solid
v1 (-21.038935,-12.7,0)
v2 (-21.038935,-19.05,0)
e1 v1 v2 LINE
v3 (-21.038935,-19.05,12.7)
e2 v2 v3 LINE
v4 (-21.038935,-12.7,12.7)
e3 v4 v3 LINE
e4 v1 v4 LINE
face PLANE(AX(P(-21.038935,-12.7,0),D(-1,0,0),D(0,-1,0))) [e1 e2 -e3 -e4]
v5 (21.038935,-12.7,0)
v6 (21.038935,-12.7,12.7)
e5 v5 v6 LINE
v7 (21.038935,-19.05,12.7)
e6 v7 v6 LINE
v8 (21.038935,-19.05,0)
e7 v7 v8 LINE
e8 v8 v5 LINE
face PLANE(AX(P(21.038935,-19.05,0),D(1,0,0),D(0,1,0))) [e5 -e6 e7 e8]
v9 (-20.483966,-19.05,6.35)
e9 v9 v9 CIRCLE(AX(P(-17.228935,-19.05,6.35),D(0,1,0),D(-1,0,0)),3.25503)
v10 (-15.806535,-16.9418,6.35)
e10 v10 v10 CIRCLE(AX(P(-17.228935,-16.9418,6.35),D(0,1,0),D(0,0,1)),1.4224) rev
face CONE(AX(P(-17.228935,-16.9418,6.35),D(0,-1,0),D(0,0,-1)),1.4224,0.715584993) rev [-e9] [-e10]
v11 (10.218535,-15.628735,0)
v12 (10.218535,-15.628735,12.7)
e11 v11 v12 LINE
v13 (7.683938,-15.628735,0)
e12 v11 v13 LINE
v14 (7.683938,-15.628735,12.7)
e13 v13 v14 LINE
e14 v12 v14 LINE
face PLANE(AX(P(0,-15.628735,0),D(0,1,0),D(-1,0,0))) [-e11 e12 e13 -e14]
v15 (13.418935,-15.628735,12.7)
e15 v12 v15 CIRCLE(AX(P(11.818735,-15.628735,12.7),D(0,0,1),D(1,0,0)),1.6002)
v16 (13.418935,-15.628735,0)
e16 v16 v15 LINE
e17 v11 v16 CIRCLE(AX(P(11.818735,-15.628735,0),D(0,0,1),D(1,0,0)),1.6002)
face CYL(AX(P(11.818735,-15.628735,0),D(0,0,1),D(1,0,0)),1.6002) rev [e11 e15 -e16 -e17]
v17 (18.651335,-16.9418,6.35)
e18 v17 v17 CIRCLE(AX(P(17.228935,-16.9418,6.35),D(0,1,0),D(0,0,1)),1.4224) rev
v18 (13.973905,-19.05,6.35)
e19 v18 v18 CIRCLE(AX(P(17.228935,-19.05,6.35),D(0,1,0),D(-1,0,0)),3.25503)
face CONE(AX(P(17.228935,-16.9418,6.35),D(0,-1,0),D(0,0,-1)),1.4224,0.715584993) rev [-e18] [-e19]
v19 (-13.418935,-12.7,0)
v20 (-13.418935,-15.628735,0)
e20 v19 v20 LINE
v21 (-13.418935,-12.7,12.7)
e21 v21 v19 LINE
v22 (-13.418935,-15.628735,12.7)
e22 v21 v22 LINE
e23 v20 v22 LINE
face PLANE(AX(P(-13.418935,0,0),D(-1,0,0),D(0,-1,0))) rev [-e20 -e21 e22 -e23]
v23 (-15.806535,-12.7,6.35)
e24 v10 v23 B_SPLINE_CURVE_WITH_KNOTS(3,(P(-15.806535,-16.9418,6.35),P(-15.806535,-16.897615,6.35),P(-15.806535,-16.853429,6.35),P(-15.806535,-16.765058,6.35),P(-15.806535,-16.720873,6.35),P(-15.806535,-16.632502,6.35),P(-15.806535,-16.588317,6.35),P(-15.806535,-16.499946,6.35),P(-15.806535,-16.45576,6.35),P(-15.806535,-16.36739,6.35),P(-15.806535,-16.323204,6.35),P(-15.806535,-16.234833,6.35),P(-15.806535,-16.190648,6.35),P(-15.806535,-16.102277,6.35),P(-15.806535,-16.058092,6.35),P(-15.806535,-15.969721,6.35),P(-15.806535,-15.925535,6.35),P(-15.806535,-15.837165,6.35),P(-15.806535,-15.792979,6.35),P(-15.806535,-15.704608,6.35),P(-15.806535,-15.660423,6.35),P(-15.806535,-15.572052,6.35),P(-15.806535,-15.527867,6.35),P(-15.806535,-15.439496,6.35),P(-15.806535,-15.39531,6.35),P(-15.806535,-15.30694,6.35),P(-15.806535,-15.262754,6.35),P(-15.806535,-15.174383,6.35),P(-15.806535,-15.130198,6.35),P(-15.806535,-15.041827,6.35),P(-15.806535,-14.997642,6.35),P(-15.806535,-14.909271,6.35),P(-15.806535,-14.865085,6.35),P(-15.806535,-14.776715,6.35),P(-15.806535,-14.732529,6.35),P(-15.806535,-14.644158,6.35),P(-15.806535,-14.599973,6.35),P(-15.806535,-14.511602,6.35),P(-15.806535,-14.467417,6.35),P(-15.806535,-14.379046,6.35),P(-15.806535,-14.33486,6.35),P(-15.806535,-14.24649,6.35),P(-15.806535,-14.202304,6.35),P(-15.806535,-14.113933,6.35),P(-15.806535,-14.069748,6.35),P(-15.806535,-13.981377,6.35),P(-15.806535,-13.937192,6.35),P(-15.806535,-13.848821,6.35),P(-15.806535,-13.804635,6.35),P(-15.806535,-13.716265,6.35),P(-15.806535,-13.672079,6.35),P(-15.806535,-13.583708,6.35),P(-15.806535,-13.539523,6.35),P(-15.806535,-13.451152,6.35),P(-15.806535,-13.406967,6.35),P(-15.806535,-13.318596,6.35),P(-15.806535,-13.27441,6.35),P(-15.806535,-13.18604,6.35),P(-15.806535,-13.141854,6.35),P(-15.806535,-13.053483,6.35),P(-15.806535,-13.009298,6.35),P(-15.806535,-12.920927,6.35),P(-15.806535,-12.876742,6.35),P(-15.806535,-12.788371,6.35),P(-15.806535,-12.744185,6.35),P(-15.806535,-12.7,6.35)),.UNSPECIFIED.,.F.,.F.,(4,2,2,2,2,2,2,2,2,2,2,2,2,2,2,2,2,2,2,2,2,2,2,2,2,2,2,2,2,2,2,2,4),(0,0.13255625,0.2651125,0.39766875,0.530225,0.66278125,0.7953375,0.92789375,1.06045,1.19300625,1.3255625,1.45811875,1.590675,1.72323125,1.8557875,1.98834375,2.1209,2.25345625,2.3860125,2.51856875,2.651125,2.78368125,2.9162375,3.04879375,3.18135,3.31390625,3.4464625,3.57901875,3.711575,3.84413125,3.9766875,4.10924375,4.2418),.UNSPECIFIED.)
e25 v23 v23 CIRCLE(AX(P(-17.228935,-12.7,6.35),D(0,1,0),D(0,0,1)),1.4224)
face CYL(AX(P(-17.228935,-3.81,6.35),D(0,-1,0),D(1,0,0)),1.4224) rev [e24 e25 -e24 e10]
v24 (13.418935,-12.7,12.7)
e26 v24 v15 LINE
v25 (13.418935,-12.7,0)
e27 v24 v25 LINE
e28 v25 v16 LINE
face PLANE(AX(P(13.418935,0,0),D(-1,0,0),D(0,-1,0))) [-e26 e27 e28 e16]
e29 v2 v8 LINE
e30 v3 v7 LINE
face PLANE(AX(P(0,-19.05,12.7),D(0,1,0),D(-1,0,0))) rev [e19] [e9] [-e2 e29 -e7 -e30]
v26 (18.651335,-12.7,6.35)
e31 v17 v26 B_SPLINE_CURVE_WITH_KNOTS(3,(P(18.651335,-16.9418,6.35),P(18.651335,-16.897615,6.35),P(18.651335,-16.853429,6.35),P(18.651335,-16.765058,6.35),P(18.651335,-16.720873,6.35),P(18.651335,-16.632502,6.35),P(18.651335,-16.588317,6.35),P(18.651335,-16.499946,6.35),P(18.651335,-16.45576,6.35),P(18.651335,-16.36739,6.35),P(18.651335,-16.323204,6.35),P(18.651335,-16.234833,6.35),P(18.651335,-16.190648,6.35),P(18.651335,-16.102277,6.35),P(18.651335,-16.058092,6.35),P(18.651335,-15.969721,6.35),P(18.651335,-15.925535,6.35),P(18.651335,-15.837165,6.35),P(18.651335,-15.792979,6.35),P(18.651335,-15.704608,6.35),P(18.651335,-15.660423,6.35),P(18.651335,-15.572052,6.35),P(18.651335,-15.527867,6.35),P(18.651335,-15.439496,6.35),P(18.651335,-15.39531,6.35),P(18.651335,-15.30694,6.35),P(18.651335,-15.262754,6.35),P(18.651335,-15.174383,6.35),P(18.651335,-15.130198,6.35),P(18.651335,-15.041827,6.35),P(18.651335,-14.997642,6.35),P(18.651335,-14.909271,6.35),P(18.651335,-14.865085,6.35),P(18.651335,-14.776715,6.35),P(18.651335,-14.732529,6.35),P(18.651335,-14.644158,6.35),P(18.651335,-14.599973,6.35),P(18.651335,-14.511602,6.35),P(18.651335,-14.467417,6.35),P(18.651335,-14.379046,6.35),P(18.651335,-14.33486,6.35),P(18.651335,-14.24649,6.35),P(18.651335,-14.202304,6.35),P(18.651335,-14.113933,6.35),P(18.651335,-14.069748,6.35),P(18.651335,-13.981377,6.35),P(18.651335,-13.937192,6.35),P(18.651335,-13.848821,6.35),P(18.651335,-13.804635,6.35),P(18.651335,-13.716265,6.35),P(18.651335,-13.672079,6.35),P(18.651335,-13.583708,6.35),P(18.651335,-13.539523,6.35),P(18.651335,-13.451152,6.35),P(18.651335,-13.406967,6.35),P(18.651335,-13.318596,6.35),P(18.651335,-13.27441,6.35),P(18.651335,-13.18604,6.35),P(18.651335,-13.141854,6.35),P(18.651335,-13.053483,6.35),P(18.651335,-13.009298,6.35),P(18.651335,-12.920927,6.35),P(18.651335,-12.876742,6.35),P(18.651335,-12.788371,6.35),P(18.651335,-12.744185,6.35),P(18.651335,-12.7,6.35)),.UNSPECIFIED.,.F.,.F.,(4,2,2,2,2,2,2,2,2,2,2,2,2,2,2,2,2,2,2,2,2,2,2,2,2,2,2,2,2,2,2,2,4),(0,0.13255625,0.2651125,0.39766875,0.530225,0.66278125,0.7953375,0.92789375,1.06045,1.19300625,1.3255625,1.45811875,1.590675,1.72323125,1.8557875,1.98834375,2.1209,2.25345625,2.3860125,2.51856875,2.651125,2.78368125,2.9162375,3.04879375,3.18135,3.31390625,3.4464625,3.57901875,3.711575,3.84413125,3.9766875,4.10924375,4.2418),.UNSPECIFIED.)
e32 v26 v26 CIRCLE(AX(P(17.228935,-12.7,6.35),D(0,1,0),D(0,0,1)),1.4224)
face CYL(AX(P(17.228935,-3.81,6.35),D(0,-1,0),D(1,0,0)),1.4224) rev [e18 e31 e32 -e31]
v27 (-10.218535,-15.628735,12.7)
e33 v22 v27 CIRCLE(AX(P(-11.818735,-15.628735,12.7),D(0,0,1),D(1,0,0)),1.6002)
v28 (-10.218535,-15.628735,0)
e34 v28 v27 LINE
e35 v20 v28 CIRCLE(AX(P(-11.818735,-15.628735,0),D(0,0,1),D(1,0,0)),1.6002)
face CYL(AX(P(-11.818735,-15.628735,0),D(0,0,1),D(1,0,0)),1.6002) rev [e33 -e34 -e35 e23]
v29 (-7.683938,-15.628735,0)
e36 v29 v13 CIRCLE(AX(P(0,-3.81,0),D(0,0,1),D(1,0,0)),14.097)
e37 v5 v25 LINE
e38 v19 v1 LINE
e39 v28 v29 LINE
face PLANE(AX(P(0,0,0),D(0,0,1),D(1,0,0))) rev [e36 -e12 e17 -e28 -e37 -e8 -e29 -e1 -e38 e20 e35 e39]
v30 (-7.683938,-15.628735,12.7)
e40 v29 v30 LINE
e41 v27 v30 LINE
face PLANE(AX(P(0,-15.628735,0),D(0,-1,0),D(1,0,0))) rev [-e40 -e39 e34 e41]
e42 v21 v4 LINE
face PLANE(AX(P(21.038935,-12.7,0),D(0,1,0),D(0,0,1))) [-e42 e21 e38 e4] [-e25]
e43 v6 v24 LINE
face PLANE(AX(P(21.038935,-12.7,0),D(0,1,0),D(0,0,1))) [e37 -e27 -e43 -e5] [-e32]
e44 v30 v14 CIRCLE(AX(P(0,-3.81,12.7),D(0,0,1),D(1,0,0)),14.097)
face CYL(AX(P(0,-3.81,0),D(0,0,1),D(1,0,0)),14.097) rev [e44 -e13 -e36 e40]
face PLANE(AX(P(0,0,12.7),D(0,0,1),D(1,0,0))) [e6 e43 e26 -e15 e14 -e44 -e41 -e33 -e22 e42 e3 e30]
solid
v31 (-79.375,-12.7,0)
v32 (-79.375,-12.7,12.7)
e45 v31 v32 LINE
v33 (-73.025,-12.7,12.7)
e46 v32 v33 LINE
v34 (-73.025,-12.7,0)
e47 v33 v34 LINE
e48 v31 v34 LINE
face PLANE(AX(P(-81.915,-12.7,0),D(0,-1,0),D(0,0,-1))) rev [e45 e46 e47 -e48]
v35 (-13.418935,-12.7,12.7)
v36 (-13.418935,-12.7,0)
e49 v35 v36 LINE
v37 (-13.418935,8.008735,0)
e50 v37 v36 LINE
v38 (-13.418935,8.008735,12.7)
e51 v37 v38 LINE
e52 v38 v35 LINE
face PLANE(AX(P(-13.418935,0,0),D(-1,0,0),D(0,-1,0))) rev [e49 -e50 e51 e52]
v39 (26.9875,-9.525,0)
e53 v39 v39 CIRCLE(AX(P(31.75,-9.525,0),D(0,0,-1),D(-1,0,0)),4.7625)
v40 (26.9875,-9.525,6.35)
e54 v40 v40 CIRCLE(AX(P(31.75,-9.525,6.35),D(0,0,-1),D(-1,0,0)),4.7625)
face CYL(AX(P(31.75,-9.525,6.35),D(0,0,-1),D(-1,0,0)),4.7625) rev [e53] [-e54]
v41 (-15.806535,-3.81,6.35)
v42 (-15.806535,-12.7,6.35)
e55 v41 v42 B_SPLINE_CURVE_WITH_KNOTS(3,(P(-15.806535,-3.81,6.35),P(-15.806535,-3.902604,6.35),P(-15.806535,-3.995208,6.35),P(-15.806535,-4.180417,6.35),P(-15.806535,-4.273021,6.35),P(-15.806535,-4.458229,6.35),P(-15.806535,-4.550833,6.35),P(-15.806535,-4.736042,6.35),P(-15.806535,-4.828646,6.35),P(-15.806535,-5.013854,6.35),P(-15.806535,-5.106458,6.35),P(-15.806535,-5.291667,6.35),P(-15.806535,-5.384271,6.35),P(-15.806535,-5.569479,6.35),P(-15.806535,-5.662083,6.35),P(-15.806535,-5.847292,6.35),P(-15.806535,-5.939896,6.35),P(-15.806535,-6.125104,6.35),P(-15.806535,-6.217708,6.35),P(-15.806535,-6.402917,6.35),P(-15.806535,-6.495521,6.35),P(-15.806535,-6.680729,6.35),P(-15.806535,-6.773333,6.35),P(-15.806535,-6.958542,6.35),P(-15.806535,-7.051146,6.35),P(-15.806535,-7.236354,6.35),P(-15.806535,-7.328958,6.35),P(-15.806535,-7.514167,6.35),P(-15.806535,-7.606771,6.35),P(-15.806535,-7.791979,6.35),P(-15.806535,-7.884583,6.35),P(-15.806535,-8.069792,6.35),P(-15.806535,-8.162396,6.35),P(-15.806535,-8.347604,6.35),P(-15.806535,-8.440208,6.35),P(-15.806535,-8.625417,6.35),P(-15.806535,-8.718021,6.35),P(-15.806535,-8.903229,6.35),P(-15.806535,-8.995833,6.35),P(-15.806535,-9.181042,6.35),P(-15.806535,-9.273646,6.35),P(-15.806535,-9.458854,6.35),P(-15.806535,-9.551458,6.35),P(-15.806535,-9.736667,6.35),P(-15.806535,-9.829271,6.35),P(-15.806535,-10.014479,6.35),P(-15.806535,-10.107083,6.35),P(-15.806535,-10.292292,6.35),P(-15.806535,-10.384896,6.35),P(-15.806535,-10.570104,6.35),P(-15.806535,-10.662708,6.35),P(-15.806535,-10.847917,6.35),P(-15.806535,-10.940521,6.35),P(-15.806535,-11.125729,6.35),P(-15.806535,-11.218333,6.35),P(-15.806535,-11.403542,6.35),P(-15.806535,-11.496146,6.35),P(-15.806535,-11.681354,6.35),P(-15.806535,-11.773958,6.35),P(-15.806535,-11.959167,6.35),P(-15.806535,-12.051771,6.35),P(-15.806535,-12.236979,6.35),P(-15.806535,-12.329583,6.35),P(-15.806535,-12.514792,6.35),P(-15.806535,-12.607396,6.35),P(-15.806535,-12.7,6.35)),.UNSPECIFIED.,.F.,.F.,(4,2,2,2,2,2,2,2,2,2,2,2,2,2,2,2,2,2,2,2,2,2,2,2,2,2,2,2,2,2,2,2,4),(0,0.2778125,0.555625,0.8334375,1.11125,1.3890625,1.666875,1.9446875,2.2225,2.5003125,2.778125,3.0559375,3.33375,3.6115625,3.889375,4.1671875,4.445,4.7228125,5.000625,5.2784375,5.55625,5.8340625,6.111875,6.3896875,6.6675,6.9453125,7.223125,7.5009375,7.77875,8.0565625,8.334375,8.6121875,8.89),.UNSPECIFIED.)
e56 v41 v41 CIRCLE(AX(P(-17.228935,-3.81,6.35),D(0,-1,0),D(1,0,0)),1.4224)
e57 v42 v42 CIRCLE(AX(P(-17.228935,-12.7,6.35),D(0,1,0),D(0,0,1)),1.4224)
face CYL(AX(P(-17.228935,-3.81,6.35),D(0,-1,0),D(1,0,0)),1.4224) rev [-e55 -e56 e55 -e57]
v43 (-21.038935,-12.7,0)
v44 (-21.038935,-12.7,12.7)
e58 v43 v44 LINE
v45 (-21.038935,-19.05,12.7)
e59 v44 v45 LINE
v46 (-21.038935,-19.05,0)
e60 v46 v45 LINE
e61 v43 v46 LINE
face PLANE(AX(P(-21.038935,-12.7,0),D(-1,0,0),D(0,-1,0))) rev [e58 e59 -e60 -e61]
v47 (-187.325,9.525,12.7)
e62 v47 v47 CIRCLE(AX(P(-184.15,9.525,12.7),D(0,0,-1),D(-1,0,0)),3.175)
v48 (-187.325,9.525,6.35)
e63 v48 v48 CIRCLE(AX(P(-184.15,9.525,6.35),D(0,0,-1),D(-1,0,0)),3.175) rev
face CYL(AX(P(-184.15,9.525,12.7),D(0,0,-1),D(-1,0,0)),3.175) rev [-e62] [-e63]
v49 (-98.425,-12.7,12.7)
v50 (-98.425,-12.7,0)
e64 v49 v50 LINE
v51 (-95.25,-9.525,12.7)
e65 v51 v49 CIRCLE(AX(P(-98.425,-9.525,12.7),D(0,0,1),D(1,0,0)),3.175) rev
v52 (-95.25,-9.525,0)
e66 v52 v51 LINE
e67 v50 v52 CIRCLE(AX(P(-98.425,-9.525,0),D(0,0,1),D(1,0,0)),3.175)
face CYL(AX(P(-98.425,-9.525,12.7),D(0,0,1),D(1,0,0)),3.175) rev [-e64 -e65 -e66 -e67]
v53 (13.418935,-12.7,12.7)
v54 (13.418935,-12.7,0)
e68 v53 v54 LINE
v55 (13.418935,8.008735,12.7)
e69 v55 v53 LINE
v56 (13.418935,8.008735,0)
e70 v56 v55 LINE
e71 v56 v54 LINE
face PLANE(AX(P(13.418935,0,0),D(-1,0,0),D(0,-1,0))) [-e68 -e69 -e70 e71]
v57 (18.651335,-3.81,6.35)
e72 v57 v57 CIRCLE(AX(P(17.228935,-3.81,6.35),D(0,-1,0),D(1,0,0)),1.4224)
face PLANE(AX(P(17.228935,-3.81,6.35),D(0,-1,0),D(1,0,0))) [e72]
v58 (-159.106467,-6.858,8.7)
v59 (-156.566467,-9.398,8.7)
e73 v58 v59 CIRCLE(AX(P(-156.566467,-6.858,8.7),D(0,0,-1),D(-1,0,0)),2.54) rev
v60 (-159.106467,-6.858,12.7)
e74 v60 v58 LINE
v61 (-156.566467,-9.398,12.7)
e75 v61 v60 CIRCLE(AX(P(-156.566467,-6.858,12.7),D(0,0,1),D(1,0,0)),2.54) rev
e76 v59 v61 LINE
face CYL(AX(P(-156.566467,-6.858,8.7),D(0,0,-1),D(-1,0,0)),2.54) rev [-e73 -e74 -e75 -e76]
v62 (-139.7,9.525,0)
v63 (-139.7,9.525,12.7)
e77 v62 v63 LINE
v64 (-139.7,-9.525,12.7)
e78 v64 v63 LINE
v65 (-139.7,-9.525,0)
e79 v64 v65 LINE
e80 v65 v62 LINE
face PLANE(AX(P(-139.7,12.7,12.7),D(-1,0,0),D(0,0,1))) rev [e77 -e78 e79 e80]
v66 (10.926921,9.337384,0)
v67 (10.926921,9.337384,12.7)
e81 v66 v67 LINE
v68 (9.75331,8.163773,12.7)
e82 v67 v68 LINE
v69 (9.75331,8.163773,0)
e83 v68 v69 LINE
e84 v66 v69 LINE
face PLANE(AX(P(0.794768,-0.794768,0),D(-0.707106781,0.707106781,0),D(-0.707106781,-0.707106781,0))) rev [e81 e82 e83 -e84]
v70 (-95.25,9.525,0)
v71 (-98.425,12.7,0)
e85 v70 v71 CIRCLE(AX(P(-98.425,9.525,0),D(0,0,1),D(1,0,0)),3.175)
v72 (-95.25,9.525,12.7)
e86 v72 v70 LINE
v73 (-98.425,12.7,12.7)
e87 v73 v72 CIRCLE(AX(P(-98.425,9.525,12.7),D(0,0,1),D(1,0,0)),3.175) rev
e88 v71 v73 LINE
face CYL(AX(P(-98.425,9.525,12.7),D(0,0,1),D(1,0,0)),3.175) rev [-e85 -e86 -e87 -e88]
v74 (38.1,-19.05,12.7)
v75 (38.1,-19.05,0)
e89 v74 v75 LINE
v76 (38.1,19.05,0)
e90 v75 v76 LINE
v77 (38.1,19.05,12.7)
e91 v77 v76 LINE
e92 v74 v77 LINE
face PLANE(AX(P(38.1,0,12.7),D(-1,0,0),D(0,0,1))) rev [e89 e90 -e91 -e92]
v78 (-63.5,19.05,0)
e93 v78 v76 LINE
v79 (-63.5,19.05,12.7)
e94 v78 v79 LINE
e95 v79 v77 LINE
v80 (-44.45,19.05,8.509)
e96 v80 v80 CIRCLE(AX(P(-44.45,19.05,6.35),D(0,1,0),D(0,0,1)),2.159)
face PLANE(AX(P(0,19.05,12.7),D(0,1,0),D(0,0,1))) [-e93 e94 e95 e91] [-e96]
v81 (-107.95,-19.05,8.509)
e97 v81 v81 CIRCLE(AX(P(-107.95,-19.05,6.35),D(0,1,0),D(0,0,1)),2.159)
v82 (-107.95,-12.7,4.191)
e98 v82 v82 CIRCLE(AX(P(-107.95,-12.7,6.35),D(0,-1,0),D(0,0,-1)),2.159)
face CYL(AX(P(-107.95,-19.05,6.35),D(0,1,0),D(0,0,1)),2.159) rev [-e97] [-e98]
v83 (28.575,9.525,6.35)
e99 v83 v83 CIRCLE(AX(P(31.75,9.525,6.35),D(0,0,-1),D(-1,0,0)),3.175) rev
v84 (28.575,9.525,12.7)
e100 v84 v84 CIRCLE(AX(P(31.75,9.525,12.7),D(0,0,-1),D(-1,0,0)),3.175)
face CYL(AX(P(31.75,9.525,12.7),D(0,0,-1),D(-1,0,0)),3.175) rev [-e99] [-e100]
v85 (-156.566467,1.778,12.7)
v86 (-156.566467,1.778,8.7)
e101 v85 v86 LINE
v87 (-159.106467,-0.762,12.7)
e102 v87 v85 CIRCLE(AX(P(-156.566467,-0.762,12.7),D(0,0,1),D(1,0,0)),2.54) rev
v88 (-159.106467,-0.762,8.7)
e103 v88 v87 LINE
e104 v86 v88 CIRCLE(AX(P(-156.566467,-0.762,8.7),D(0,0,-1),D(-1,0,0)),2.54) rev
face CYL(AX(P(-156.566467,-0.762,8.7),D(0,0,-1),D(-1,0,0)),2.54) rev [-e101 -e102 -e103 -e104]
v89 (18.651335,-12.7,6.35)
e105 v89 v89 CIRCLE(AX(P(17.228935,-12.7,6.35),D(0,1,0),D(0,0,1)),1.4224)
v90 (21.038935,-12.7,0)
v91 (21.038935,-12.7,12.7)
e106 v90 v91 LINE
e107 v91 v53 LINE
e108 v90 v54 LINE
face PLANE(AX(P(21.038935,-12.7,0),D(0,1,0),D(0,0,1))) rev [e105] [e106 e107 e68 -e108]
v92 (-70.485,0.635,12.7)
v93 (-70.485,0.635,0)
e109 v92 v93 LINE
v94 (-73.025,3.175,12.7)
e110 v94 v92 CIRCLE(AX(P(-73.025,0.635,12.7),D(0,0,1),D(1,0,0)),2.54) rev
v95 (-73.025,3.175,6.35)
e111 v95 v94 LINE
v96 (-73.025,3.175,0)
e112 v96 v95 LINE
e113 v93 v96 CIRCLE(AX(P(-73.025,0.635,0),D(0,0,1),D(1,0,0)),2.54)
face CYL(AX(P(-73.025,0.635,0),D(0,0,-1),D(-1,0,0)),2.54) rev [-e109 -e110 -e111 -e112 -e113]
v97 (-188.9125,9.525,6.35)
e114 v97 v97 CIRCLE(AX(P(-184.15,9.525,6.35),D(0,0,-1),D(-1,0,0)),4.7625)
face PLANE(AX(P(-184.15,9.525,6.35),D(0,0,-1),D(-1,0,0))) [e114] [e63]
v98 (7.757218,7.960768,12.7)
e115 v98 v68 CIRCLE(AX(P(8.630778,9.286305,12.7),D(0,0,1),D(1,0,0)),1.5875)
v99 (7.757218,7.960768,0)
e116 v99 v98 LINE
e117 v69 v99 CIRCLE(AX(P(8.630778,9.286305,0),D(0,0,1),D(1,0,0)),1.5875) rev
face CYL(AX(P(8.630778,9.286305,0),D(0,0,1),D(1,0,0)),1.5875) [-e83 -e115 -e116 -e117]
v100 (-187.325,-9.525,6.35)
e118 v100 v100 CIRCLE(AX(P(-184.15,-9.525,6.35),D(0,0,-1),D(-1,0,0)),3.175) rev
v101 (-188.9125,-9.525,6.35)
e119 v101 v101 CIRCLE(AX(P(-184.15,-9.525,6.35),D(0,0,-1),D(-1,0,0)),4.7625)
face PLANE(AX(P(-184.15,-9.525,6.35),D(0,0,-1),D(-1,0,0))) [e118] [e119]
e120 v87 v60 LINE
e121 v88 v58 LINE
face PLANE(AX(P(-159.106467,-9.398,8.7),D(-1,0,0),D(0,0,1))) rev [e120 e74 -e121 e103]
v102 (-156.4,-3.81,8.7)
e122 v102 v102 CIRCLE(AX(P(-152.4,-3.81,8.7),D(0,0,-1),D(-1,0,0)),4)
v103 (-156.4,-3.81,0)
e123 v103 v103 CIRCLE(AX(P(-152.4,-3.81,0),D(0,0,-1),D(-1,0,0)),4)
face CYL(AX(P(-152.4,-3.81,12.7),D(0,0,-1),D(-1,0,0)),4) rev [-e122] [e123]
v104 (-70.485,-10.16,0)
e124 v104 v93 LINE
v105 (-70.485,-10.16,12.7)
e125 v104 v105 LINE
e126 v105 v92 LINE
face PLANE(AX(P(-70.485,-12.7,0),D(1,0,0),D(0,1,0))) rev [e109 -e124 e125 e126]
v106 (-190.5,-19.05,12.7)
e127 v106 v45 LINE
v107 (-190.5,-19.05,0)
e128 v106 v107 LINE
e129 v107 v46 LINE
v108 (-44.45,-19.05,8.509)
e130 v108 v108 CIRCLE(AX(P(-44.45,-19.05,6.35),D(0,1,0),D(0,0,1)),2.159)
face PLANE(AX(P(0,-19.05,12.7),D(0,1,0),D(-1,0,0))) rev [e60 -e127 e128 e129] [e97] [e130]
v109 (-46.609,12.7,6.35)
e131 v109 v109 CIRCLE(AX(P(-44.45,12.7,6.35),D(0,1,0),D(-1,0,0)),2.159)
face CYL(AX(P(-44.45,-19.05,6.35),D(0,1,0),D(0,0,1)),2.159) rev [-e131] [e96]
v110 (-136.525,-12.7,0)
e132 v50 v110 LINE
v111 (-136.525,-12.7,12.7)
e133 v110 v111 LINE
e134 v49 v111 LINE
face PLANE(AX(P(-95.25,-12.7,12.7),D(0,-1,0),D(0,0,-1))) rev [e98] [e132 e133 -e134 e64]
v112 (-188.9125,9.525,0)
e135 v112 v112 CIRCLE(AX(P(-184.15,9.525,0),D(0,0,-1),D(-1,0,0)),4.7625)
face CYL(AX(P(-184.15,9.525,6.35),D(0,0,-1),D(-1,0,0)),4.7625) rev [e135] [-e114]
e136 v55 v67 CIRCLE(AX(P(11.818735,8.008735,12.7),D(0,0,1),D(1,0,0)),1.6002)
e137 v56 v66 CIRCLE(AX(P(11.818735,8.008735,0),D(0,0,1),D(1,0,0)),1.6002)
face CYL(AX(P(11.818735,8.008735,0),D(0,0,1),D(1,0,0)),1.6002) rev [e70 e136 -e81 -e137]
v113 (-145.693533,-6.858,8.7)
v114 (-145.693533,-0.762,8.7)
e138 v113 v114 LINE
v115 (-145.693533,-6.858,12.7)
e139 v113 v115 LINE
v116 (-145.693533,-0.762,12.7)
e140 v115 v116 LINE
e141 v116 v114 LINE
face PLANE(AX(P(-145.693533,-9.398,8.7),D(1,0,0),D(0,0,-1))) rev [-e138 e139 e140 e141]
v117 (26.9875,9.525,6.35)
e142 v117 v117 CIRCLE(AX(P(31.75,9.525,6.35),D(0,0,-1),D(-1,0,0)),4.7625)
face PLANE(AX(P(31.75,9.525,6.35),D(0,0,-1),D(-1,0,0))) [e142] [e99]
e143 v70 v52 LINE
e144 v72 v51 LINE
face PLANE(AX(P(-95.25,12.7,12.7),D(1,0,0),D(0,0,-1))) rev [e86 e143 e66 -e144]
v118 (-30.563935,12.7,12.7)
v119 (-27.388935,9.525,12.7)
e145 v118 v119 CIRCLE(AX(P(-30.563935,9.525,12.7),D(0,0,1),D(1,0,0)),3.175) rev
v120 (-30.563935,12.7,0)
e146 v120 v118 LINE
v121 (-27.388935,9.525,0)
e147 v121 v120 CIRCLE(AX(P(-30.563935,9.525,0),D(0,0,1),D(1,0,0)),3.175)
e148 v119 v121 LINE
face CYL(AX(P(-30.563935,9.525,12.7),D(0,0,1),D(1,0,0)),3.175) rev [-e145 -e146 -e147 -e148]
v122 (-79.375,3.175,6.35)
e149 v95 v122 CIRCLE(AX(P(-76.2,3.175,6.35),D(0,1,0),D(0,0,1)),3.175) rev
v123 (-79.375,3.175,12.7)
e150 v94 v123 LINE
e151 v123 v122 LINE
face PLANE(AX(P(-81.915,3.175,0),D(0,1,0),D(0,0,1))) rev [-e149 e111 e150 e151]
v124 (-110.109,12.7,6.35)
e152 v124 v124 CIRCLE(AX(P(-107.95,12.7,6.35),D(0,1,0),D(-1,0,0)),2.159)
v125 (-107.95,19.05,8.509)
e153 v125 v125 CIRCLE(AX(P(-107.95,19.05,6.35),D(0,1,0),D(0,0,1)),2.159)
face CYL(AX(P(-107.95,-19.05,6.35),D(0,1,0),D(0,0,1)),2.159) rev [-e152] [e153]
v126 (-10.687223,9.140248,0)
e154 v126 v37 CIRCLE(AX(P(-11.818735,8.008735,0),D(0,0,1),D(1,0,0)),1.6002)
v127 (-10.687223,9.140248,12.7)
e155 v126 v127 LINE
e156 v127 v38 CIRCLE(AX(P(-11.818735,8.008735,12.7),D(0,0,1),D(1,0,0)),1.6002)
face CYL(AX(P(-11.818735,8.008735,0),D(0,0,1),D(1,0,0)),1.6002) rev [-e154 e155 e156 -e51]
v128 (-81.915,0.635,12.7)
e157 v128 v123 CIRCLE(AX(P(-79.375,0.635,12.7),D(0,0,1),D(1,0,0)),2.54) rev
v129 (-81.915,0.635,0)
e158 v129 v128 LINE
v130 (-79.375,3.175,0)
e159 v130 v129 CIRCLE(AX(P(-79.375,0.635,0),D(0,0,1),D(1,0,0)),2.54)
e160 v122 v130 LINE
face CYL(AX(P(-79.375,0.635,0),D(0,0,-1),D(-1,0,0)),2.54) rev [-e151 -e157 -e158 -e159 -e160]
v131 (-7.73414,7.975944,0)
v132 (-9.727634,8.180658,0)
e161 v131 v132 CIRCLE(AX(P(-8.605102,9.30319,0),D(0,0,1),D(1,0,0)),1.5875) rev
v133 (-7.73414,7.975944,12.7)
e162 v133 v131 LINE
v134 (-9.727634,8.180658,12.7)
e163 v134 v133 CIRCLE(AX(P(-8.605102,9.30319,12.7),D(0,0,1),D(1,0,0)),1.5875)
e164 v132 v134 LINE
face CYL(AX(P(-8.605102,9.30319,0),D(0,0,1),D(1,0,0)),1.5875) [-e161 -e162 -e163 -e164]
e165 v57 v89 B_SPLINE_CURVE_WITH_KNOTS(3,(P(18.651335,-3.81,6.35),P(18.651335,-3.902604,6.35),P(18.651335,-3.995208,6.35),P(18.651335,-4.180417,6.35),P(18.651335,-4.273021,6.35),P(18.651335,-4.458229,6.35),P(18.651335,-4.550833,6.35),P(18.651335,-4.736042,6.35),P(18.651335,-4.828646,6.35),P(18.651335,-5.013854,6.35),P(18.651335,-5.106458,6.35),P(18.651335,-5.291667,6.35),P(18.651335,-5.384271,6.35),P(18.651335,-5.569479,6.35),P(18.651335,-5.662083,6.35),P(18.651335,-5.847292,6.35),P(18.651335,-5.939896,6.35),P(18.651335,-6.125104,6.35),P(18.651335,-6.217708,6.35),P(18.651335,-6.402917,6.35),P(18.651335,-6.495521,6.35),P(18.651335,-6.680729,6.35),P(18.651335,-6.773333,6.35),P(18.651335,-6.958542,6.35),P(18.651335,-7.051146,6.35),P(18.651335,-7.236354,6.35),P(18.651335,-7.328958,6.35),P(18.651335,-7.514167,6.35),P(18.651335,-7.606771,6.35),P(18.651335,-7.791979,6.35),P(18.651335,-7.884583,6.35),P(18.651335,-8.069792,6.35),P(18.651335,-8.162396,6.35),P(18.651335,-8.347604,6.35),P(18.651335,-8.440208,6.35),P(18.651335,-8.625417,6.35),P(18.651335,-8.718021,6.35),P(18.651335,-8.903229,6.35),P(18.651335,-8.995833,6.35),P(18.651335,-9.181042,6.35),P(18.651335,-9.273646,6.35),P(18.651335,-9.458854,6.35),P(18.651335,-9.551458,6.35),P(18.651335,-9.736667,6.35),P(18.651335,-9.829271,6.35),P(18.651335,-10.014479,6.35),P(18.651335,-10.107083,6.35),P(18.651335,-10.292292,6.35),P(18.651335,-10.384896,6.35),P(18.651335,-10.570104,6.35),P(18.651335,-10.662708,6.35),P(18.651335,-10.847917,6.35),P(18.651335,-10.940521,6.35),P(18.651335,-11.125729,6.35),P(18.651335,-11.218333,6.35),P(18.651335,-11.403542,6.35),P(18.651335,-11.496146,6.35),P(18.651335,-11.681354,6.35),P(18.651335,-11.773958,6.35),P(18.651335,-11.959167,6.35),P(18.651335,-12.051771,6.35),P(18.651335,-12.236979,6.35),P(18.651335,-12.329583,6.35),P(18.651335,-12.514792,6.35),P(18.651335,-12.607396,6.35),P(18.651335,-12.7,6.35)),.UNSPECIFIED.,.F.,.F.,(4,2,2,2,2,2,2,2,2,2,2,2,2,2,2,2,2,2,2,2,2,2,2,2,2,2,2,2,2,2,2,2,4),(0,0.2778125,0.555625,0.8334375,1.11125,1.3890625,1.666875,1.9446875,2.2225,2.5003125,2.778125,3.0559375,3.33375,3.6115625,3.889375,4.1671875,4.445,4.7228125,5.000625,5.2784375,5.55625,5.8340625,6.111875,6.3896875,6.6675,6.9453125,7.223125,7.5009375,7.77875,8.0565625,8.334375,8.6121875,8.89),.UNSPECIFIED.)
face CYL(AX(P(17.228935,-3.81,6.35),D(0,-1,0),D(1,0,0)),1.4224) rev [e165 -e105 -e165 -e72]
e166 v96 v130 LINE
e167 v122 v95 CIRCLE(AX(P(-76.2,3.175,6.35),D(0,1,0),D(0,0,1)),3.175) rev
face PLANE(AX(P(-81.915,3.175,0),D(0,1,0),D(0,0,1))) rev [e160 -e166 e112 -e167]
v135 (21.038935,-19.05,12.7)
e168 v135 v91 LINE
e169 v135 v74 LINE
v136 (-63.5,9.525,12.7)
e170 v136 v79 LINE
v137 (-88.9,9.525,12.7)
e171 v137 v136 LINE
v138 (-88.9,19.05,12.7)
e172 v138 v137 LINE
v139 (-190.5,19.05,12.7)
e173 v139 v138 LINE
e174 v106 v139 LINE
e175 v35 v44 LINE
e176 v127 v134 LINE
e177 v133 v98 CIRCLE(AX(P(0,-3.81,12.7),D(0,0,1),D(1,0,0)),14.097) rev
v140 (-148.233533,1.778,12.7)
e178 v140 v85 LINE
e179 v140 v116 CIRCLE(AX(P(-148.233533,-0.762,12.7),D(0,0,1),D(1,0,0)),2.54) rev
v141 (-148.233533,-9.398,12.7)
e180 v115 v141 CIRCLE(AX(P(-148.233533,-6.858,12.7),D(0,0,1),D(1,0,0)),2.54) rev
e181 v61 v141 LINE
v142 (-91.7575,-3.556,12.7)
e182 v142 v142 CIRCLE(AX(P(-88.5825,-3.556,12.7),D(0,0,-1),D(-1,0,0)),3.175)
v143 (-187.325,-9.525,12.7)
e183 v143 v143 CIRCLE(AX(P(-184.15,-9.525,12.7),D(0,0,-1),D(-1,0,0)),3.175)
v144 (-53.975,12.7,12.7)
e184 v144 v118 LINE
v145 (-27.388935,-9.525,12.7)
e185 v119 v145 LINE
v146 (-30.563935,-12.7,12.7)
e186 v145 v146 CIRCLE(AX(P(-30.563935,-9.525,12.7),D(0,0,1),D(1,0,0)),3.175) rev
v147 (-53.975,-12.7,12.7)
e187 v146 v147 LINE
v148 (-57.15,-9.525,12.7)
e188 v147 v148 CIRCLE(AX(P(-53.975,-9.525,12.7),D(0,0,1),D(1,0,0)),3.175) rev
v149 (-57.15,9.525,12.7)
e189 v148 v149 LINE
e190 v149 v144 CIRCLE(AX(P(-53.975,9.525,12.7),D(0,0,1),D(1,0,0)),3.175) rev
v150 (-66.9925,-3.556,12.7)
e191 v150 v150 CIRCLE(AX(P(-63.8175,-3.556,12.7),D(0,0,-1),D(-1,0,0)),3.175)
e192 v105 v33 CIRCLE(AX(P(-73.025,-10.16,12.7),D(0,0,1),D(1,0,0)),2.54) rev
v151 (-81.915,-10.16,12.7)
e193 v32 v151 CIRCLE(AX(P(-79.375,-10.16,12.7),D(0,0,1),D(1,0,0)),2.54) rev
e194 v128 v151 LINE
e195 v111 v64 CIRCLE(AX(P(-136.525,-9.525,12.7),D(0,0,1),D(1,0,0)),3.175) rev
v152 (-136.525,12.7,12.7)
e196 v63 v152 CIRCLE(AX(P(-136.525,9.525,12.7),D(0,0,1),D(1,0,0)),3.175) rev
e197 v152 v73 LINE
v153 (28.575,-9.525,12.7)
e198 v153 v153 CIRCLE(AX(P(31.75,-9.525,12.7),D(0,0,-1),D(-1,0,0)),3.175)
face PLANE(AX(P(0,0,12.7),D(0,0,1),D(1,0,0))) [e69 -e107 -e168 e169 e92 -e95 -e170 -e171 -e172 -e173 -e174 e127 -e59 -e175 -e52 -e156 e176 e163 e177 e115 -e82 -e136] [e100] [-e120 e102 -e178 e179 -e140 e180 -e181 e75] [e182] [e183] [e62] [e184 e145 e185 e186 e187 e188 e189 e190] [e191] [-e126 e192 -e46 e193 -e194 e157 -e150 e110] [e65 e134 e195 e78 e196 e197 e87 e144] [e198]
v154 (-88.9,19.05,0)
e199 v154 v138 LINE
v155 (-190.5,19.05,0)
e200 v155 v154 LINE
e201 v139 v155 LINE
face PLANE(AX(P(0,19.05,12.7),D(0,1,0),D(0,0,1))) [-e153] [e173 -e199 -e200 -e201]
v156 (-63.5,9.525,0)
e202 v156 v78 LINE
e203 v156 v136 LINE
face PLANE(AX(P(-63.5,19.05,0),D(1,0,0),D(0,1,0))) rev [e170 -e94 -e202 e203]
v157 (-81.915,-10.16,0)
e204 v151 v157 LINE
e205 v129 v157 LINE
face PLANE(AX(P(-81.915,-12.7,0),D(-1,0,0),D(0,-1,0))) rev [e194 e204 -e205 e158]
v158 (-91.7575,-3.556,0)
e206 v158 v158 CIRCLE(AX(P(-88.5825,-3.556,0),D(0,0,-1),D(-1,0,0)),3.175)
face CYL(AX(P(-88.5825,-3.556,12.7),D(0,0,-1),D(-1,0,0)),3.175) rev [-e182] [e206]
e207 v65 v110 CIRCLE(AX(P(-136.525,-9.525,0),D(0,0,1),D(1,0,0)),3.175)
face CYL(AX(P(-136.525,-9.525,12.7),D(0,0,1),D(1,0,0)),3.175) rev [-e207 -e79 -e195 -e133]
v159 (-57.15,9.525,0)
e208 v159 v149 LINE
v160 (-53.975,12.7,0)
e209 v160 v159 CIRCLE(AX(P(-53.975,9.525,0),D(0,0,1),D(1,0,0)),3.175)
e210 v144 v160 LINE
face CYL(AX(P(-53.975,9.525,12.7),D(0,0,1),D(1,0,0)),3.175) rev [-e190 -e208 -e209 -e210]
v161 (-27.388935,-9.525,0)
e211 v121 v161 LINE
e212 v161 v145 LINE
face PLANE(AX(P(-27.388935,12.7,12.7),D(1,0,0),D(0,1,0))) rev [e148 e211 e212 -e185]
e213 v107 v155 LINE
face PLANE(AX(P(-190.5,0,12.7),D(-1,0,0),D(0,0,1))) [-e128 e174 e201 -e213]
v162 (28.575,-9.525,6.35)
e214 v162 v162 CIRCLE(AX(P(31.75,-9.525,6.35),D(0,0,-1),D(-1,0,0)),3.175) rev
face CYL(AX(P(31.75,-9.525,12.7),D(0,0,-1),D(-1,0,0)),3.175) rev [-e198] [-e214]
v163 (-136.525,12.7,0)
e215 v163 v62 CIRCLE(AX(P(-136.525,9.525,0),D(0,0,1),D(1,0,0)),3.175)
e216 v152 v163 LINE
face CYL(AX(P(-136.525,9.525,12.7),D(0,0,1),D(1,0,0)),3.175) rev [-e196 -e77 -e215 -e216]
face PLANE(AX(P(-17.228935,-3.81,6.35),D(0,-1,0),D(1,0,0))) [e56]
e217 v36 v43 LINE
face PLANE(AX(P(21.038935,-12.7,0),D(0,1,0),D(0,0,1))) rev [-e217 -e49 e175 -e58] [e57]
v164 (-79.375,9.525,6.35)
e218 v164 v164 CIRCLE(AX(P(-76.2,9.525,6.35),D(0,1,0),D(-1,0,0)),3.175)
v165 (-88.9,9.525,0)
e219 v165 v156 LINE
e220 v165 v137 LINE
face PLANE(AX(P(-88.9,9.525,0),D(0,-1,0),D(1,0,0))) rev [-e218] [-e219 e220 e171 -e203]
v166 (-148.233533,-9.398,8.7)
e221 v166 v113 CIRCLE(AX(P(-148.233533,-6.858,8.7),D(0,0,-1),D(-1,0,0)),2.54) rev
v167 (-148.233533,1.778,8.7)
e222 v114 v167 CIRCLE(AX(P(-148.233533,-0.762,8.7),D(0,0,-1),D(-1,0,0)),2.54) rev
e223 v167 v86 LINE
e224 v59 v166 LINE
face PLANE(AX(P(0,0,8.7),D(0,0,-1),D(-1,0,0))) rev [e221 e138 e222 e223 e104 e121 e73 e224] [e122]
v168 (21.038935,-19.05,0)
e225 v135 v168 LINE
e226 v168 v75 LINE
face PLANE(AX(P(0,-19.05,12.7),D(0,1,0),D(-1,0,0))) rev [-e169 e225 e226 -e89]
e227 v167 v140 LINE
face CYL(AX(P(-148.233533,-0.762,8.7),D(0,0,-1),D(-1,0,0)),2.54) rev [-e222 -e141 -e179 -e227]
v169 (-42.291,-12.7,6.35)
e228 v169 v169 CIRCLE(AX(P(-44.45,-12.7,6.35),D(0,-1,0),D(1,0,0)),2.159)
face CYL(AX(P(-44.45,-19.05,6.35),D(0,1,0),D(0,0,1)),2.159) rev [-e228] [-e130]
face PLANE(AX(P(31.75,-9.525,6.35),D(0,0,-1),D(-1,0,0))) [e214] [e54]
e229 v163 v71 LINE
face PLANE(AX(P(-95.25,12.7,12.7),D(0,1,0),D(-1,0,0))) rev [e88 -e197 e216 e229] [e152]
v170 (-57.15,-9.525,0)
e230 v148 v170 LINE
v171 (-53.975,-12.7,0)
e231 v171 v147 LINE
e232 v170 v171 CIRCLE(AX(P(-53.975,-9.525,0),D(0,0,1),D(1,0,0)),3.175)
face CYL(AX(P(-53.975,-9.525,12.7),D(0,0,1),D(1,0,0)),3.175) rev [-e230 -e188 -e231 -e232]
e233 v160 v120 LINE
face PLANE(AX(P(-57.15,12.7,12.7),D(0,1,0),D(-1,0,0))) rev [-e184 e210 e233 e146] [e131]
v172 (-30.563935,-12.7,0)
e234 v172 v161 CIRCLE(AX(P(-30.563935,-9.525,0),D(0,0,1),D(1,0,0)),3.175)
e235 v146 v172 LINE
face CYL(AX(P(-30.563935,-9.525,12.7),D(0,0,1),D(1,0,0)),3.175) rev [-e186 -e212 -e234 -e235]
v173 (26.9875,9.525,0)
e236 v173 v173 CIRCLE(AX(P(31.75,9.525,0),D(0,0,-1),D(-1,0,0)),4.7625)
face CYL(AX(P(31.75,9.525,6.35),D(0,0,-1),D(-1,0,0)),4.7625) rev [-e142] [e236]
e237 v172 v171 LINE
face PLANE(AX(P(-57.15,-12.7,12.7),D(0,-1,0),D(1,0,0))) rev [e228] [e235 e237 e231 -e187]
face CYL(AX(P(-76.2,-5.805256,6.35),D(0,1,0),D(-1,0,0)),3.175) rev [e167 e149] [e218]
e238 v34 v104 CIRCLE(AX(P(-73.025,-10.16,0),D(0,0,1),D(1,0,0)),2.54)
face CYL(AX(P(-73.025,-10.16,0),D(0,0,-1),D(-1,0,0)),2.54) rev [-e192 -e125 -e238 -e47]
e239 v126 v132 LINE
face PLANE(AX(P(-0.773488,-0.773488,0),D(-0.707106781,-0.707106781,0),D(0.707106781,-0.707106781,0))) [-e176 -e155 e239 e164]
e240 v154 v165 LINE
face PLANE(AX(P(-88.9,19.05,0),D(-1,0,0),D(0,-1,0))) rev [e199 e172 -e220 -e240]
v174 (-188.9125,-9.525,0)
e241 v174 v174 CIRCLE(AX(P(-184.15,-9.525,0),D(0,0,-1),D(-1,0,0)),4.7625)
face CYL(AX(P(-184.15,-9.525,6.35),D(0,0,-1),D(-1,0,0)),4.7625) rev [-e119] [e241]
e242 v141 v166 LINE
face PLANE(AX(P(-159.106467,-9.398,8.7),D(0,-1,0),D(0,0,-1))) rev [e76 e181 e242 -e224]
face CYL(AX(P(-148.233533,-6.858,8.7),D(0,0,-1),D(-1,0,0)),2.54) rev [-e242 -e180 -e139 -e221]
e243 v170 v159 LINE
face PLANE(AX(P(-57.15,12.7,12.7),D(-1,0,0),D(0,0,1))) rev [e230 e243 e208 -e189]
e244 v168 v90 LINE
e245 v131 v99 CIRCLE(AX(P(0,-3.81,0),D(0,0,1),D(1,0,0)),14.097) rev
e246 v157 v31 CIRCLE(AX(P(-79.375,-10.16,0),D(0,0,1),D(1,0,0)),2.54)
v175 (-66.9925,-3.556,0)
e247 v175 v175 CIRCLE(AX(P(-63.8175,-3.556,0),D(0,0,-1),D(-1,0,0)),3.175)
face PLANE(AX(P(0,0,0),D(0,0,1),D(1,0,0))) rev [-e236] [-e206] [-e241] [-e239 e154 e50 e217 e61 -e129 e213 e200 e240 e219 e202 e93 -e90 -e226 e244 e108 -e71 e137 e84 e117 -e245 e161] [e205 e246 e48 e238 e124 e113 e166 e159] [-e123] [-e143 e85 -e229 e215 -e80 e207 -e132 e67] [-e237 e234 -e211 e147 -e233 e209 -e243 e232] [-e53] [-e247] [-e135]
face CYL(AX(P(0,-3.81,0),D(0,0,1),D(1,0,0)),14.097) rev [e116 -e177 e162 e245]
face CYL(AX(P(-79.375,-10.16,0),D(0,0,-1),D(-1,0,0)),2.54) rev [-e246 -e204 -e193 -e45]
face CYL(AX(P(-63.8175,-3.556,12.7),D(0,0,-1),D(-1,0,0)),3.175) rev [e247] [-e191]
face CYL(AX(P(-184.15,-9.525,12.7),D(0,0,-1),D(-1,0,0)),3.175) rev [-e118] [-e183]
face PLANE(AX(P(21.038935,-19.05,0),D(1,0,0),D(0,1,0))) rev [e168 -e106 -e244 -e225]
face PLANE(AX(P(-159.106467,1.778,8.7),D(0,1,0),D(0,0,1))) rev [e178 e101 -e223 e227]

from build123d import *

# Parameters (mm, degrees)
SKETCH1_W                = 228.6
SKETCH1_H                = 38.1
BOSS_EXTRUDE1_DEPTH      = 12.7
CUT_EXTRUDE4_DEPTH       = 192.870900608
FILLET1_R                = 1.5875
SKETCH6_W                = 25.4
SKETCH6_H                = 9.525
CUT_EXTRUDE5_DEPTH       = 192.870900608
SKETCH7_W                = 11.43
SKETCH7_H                = 15.875
CUT_EXTRUDE6_DEPTH       = 192.870900608
SKETCH8_R                = 3.175
CUT_EXTRUDE7_DEPTH       = 6.35
SKETCH9_R                = 3.175
CUT_EXTRUDE8_DEPTH       = 192.870900608
SKETCH10_R               = 4.7625
CUT_EXTRUDE9_DEPTH       = 6.35
SURFACE_EXTRUDE1_1_BACK  = 12.7
SURFACE_EXTRUDE1_1_DEPTH = 12.7
SURFACE_EXTRUDE1_2_BACK  = 12.7
SURFACE_EXTRUDE1_2_DEPTH = 12.7
FILLET2_R                = 2.54
SKETCH12_R               = 1.4224
CUT_EXTRUDE10_DEPTH      = 15.24
CHAMFER1_SIZE            = 2.1082
CHAMFER1_SIZE2           = 1.832630301
CHAMFER2_SIZE            = 2.1082
CHAMFER2_SIZE2           = 1.832630301
SKETCH13_W               = 29.761064524
SKETCH13_H               = 25.4
SKETCH13_W_2             = 44.45
CUT_EXTRUDE11_DEPTH      = 192.870900608
FILLET3_R                = 3.175
SKETCH14_R               = 2.159
CUT_EXTRUDE12_DEPTH      = 195.687313403
SKETCH15_R               = 3.175
CUT_EXTRUDE13_DEPTH      = 192.870900608
SKETCH16_W               = 13.412933216
SKETCH16_H               = 11.176
CUT_EXTRUDE14_DEPTH      = 4.000000128
FILLET4_R                = 2.54
SKETCH17_R               = 3.175
CUT_EXTRUDE15_DEPTH      = 192.870900608
SKETCH18_R               = 4
CUT_EXTRUDE16_DEPTH      = 192.870900608


with BuildPart() as part:
    # Sketch1 → Boss-Extrude1 (new body)
    with BuildSketch(Plane.XY):
        with Locations((-76.2, 0)):
            Rectangle(SKETCH1_W, SKETCH1_H)
    extrude(amount=BOSS_EXTRUDE1_DEPTH)

    # Sketch5 → Cut-Extrude4 (cut, through all)
    with BuildSketch(Plane.XY.offset(12.7)):
        with BuildLine():
            Line((-8.772142836, 7.225167378), (-10.687223205, 9.140247747))
            ThreePointArc((-10.687223205, 9.140247747), (-12.431105504, 9.487127504), (-13.418935476, 8.008735476))
            Line((-13.418935476, 8.008735476), (-13.418935476, -15.628735476))
            ThreePointArc((-13.418935476, -15.628735476), (-11.818735476, -17.228935476), (-10.218535476, -15.628735476))
            Line((-10.218535476, -15.628735476), (-7.683937842, -15.628735476))
            ThreePointArc((-7.683937842, -15.628735476), (0, -17.907), (7.683937842, -15.628735476))
            Line((7.683937842, -15.628735476), (10.218535476, -15.628735476))
            ThreePointArc((10.218535476, -15.628735476), (11.818735476, -17.228935476), (13.418935476, -15.628735476))
            Line((13.418935476, -15.628735476), (13.418935476, 8.008735476))
            ThreePointArc((13.418935476, 8.008735476), (12.571582801, 9.420776887), (10.926920796, 9.337383893))
            Line((10.926920796, 9.337383893), (8.795831767, 7.206294864))
            ThreePointArc((8.795831767, 7.206294864), (0.015143788, 10.286991866), (-8.772142836, 7.225167378))
        make_face()
    extrude(amount=-CUT_EXTRUDE4_DEPTH, mode=Mode.SUBTRACT)

    # Fillet1
    fillet1_edges = [part.edges().sort_by_distance(p)[0] for p in [
        (-8.772142836, 7.225167378, 6.35),
        (8.795831767, 7.206294864, 6.35),
    ]]
    fillet(fillet1_edges, radius=FILLET1_R)

    # Sketch6 → Cut-Extrude5 (cut, through all)
    with BuildSketch(Plane.XY.offset(12.7)):
        with Locations((-76.2, 14.2875)):
            Rectangle(SKETCH6_W, SKETCH6_H)
    extrude(amount=-CUT_EXTRUDE5_DEPTH, mode=Mode.SUBTRACT)

    # Sketch7 → Cut-Extrude6 (cut, through all)
    with BuildSketch(Plane.XY.offset(12.7)):
        with Locations((-76.2, -4.7625)):
            Rectangle(SKETCH7_W, SKETCH7_H)
    extrude(amount=-CUT_EXTRUDE6_DEPTH, mode=Mode.SUBTRACT)

    # Sketch8 → Cut-Extrude7 (cut)
    with BuildSketch(Plane(origin=(0, 9.525, 0), x_dir=(1, 0, 0), z_dir=(0, 1, 0))):
        with Locations(Location((-76.2, -6.35, 0), (0, 0, 180))):
            Circle(SKETCH8_R)
    extrude(amount=-CUT_EXTRUDE7_DEPTH, mode=Mode.SUBTRACT)

    # Sketch9 → Cut-Extrude8 (cut, through all)
    with BuildSketch(Plane(origin=(0, 0, 0), x_dir=(-1, 0, 0), z_dir=(0, 0, -1))):
        with Locations((-31.75, 9.525)):
            Circle(SKETCH9_R)
        with Locations((-31.75, -9.525)):
            Circle(SKETCH9_R)
        with Locations((184.15, 9.525)):
            Circle(SKETCH9_R)
        with Locations((184.15, -9.525)):
            Circle(SKETCH9_R)
    extrude(amount=-CUT_EXTRUDE8_DEPTH, mode=Mode.SUBTRACT)

    # Sketch10 → Cut-Extrude9 (cut)
    with BuildSketch(Plane(origin=(0, 0, 0), x_dir=(-1, 0, 0), z_dir=(0, 0, -1))):
        with Locations((-31.75, 9.525)):
            Circle(SKETCH10_R)
        with Locations((-31.75, -9.525)):
            Circle(SKETCH10_R)
        with Locations((184.15, 9.525)):
            Circle(SKETCH10_R)
        with Locations((184.15, -9.525)):
            Circle(SKETCH10_R)
    extrude(amount=-CUT_EXTRUDE9_DEPTH, mode=Mode.SUBTRACT)


with BuildPart() as body_2:
    # Split1: the piece behind the surface
    add(part.part)
    # Surface-Extrude1: a surface, the sketch's curves swept straight by 12.7 mm
    with BuildLine(Plane(origin=(0, 0, 0), x_dir=(-1, 0, 0), z_dir=(0, 0, -1)).offset(-SURFACE_EXTRUDE1_1_BACK), mode=Mode.PRIVATE) as surface_extrude1_1_path:
        Line((-21.038935476, -19.05), (-21.038935476, -12.7))
        Line((-21.038935476, -12.7), (21.038935476, -12.7))
        Line((21.038935476, -12.7), (21.038935476, -19.05))
    surface_extrude1_1 = Shell.extrude(surface_extrude1_1_path.wire(), (0 * SURFACE_EXTRUDE1_1_DEPTH, 0 * SURFACE_EXTRUDE1_1_DEPTH, -1 * SURFACE_EXTRUDE1_1_DEPTH))
    split(bisect_by=surface_extrude1_1, keep=Keep.BOTTOM)


with BuildPart() as part_1:
    add(part.part)

    # Split1: split by a surface, the side it looks to stays
    # Surface-Extrude1: a surface, the sketch's curves swept straight by 12.7 mm
    with BuildLine(Plane(origin=(0, 0, 0), x_dir=(-1, 0, 0), z_dir=(0, 0, -1)).offset(-SURFACE_EXTRUDE1_2_BACK), mode=Mode.PRIVATE) as surface_extrude1_2_path:
        Line((-21.038935476, -19.05), (-21.038935476, -12.7))
        Line((-21.038935476, -12.7), (21.038935476, -12.7))
        Line((21.038935476, -12.7), (21.038935476, -19.05))
    surface_extrude1_2 = Shell.extrude(surface_extrude1_2_path.wire(), (0 * SURFACE_EXTRUDE1_2_DEPTH, 0 * SURFACE_EXTRUDE1_2_DEPTH, -1 * SURFACE_EXTRUDE1_2_DEPTH))
    split(bisect_by=surface_extrude1_2, keep=Keep.TOP)

    # Fillet2
    fillet2_edges = [part_1.edges().sort_by_distance(p)[0] for p in [
        (-70.485, -12.7, 6.35),
        (-81.915, -12.7, 6.35),
        (-81.915, 3.175, 6.35),
        (-70.485, 3.175, 6.35),
    ]]
    fillet(fillet2_edges, radius=FILLET2_R - 0.0001)  # a hair under: the kernel refuses the full size


with BuildPart() as cut_extrude10_tool:
    # Sketch12 → Cut-Extrude10 (new body)
    with BuildSketch(Plane.XZ.offset(19.05)):
        with Locations((-17.228935476, 6.35)):
            Circle(SKETCH12_R)
        with Locations((17.228935476, 6.35)):
            Circle(SKETCH12_R)
    extrude(amount=-CUT_EXTRUDE10_DEPTH)


with BuildPart() as part_2:
    add(part_1.part)

    # Cut-Extrude10: cut by cut_extrude10_tool
    add(cut_extrude10_tool.part, mode=Mode.SUBTRACT)

    # Sketch13 → Cut-Extrude11 (cut, through all)
    with BuildSketch(Plane(origin=(0, 0, 0), x_dir=(-1, 0, 0), z_dir=(0, 0, -1))):
        with Locations((42.269467738, 0)):
            Rectangle(SKETCH13_W, SKETCH13_H)
        with Locations((117.475, 0)):
            Rectangle(SKETCH13_W_2, SKETCH13_H)
    extrude(amount=-CUT_EXTRUDE11_DEPTH, mode=Mode.SUBTRACT)

    # Fillet3
    fillet3_edges = [part_2.edges().sort_by_distance(p)[0] for p in [
        (-57.15, 12.7, 6.35),
        (-57.15, -12.7, 6.35),
        (-27.388935476, -12.7, 6.35),
        (-27.388935476, 12.7, 6.35),
        (-95.25, -12.7, 6.35),
        (-95.25, 12.7, 6.35),
        (-139.7, 12.7, 6.35),
        (-139.7, -12.7, 6.35),
    ]]
    fillet(fillet3_edges, radius=FILLET3_R)

    # Sketch14 → Cut-Extrude12 (cut, through all)
    with BuildSketch(Plane(origin=(0, 19.05, 0), x_dir=(1, 0, 0), z_dir=(0, 1, 0))):
        with Locations(Location((-107.95, -6.35, 0), (0, 0, 270))):
            Circle(SKETCH14_R)
        with Locations(Location((-44.45, -6.35, 0), (0, 0, 270))):
            Circle(SKETCH14_R)
    extrude(amount=-CUT_EXTRUDE12_DEPTH, mode=Mode.SUBTRACT)

    # Sketch15 → Cut-Extrude13 (cut, through all)
    with BuildSketch(Plane(origin=(0, 0, 0), x_dir=(-1, 0, 0), z_dir=(0, 0, -1))):
        with Locations((152.4, -3.81)):
            Circle(SKETCH15_R)
    extrude(amount=-CUT_EXTRUDE13_DEPTH, mode=Mode.SUBTRACT)

    # Sketch16 → Cut-Extrude14 (cut)
    with BuildSketch(Plane.XY.offset(12.7)):
        with Locations((-152.4, -3.81)):
            Rectangle(SKETCH16_W, SKETCH16_H)
    extrude(amount=-CUT_EXTRUDE14_DEPTH, mode=Mode.SUBTRACT)

    # Fillet4
    fillet4_edges = [part_2.edges().sort_by_distance(p)[0] for p in [
        (-145.693533392, 1.778, 10.699999936),
        (-145.693533392, -9.398, 10.699999936),
        (-159.106466608, -9.398, 10.699999936),
        (-159.106466608, 1.778, 10.699999936),
    ]]
    fillet(fillet4_edges, radius=FILLET4_R)

    # Sketch17 → Cut-Extrude15 (cut, through all)
    with BuildSketch(Plane(origin=(0, 0, 0), x_dir=(-1, 0, 0), z_dir=(0, 0, -1))):
        with Locations((63.8175, -3.556)):
            Circle(SKETCH17_R)
        with Locations((88.5825, -3.556)):
            Circle(SKETCH17_R)
    extrude(amount=-CUT_EXTRUDE15_DEPTH, mode=Mode.SUBTRACT)

    # Sketch18 → Cut-Extrude16 (cut, through all)
    with BuildSketch(Plane(origin=(0, 0, 0), x_dir=(-1, 0, 0), z_dir=(0, 0, -1))):
        with Locations((152.4, -3.81)):
            Circle(SKETCH18_R)
    extrude(amount=-CUT_EXTRUDE16_DEPTH, mode=Mode.SUBTRACT)


with BuildPart() as body_2_1:
    add(body_2.part)

    # Cut-Extrude10: cut by cut_extrude10_tool
    add(cut_extrude10_tool.part, mode=Mode.SUBTRACT)

    # Chamfer1
    chamfer1_edges = [body_2_1.edges().sort_by_distance(p)[0] for p in [
        (15.806535476, -19.05, 6.35),
    ]]
    chamfer1_side = [body_2_1.faces().sort_by_distance(p)[0] for p in [
        (15.806535476, -15.875, 6.35),
    ]]
    chamfer(chamfer1_edges, length=CHAMFER1_SIZE, length2=CHAMFER1_SIZE2, reference=chamfer1_side[0])

    # Chamfer2
    chamfer2_edges = [body_2_1.edges().sort_by_distance(p)[0] for p in [
        (-18.651335476, -19.05, 6.35),
    ]]
    chamfer2_side = [body_2_1.faces().sort_by_distance(p)[0] for p in [
        (-18.651335476, -15.875, 6.35),
    ]]
    chamfer(chamfer2_edges, length=CHAMFER2_SIZE, length2=CHAMFER2_SIZE2, reference=chamfer2_side[0])


solid = Compound([part_2.part, body_2_1.part])
